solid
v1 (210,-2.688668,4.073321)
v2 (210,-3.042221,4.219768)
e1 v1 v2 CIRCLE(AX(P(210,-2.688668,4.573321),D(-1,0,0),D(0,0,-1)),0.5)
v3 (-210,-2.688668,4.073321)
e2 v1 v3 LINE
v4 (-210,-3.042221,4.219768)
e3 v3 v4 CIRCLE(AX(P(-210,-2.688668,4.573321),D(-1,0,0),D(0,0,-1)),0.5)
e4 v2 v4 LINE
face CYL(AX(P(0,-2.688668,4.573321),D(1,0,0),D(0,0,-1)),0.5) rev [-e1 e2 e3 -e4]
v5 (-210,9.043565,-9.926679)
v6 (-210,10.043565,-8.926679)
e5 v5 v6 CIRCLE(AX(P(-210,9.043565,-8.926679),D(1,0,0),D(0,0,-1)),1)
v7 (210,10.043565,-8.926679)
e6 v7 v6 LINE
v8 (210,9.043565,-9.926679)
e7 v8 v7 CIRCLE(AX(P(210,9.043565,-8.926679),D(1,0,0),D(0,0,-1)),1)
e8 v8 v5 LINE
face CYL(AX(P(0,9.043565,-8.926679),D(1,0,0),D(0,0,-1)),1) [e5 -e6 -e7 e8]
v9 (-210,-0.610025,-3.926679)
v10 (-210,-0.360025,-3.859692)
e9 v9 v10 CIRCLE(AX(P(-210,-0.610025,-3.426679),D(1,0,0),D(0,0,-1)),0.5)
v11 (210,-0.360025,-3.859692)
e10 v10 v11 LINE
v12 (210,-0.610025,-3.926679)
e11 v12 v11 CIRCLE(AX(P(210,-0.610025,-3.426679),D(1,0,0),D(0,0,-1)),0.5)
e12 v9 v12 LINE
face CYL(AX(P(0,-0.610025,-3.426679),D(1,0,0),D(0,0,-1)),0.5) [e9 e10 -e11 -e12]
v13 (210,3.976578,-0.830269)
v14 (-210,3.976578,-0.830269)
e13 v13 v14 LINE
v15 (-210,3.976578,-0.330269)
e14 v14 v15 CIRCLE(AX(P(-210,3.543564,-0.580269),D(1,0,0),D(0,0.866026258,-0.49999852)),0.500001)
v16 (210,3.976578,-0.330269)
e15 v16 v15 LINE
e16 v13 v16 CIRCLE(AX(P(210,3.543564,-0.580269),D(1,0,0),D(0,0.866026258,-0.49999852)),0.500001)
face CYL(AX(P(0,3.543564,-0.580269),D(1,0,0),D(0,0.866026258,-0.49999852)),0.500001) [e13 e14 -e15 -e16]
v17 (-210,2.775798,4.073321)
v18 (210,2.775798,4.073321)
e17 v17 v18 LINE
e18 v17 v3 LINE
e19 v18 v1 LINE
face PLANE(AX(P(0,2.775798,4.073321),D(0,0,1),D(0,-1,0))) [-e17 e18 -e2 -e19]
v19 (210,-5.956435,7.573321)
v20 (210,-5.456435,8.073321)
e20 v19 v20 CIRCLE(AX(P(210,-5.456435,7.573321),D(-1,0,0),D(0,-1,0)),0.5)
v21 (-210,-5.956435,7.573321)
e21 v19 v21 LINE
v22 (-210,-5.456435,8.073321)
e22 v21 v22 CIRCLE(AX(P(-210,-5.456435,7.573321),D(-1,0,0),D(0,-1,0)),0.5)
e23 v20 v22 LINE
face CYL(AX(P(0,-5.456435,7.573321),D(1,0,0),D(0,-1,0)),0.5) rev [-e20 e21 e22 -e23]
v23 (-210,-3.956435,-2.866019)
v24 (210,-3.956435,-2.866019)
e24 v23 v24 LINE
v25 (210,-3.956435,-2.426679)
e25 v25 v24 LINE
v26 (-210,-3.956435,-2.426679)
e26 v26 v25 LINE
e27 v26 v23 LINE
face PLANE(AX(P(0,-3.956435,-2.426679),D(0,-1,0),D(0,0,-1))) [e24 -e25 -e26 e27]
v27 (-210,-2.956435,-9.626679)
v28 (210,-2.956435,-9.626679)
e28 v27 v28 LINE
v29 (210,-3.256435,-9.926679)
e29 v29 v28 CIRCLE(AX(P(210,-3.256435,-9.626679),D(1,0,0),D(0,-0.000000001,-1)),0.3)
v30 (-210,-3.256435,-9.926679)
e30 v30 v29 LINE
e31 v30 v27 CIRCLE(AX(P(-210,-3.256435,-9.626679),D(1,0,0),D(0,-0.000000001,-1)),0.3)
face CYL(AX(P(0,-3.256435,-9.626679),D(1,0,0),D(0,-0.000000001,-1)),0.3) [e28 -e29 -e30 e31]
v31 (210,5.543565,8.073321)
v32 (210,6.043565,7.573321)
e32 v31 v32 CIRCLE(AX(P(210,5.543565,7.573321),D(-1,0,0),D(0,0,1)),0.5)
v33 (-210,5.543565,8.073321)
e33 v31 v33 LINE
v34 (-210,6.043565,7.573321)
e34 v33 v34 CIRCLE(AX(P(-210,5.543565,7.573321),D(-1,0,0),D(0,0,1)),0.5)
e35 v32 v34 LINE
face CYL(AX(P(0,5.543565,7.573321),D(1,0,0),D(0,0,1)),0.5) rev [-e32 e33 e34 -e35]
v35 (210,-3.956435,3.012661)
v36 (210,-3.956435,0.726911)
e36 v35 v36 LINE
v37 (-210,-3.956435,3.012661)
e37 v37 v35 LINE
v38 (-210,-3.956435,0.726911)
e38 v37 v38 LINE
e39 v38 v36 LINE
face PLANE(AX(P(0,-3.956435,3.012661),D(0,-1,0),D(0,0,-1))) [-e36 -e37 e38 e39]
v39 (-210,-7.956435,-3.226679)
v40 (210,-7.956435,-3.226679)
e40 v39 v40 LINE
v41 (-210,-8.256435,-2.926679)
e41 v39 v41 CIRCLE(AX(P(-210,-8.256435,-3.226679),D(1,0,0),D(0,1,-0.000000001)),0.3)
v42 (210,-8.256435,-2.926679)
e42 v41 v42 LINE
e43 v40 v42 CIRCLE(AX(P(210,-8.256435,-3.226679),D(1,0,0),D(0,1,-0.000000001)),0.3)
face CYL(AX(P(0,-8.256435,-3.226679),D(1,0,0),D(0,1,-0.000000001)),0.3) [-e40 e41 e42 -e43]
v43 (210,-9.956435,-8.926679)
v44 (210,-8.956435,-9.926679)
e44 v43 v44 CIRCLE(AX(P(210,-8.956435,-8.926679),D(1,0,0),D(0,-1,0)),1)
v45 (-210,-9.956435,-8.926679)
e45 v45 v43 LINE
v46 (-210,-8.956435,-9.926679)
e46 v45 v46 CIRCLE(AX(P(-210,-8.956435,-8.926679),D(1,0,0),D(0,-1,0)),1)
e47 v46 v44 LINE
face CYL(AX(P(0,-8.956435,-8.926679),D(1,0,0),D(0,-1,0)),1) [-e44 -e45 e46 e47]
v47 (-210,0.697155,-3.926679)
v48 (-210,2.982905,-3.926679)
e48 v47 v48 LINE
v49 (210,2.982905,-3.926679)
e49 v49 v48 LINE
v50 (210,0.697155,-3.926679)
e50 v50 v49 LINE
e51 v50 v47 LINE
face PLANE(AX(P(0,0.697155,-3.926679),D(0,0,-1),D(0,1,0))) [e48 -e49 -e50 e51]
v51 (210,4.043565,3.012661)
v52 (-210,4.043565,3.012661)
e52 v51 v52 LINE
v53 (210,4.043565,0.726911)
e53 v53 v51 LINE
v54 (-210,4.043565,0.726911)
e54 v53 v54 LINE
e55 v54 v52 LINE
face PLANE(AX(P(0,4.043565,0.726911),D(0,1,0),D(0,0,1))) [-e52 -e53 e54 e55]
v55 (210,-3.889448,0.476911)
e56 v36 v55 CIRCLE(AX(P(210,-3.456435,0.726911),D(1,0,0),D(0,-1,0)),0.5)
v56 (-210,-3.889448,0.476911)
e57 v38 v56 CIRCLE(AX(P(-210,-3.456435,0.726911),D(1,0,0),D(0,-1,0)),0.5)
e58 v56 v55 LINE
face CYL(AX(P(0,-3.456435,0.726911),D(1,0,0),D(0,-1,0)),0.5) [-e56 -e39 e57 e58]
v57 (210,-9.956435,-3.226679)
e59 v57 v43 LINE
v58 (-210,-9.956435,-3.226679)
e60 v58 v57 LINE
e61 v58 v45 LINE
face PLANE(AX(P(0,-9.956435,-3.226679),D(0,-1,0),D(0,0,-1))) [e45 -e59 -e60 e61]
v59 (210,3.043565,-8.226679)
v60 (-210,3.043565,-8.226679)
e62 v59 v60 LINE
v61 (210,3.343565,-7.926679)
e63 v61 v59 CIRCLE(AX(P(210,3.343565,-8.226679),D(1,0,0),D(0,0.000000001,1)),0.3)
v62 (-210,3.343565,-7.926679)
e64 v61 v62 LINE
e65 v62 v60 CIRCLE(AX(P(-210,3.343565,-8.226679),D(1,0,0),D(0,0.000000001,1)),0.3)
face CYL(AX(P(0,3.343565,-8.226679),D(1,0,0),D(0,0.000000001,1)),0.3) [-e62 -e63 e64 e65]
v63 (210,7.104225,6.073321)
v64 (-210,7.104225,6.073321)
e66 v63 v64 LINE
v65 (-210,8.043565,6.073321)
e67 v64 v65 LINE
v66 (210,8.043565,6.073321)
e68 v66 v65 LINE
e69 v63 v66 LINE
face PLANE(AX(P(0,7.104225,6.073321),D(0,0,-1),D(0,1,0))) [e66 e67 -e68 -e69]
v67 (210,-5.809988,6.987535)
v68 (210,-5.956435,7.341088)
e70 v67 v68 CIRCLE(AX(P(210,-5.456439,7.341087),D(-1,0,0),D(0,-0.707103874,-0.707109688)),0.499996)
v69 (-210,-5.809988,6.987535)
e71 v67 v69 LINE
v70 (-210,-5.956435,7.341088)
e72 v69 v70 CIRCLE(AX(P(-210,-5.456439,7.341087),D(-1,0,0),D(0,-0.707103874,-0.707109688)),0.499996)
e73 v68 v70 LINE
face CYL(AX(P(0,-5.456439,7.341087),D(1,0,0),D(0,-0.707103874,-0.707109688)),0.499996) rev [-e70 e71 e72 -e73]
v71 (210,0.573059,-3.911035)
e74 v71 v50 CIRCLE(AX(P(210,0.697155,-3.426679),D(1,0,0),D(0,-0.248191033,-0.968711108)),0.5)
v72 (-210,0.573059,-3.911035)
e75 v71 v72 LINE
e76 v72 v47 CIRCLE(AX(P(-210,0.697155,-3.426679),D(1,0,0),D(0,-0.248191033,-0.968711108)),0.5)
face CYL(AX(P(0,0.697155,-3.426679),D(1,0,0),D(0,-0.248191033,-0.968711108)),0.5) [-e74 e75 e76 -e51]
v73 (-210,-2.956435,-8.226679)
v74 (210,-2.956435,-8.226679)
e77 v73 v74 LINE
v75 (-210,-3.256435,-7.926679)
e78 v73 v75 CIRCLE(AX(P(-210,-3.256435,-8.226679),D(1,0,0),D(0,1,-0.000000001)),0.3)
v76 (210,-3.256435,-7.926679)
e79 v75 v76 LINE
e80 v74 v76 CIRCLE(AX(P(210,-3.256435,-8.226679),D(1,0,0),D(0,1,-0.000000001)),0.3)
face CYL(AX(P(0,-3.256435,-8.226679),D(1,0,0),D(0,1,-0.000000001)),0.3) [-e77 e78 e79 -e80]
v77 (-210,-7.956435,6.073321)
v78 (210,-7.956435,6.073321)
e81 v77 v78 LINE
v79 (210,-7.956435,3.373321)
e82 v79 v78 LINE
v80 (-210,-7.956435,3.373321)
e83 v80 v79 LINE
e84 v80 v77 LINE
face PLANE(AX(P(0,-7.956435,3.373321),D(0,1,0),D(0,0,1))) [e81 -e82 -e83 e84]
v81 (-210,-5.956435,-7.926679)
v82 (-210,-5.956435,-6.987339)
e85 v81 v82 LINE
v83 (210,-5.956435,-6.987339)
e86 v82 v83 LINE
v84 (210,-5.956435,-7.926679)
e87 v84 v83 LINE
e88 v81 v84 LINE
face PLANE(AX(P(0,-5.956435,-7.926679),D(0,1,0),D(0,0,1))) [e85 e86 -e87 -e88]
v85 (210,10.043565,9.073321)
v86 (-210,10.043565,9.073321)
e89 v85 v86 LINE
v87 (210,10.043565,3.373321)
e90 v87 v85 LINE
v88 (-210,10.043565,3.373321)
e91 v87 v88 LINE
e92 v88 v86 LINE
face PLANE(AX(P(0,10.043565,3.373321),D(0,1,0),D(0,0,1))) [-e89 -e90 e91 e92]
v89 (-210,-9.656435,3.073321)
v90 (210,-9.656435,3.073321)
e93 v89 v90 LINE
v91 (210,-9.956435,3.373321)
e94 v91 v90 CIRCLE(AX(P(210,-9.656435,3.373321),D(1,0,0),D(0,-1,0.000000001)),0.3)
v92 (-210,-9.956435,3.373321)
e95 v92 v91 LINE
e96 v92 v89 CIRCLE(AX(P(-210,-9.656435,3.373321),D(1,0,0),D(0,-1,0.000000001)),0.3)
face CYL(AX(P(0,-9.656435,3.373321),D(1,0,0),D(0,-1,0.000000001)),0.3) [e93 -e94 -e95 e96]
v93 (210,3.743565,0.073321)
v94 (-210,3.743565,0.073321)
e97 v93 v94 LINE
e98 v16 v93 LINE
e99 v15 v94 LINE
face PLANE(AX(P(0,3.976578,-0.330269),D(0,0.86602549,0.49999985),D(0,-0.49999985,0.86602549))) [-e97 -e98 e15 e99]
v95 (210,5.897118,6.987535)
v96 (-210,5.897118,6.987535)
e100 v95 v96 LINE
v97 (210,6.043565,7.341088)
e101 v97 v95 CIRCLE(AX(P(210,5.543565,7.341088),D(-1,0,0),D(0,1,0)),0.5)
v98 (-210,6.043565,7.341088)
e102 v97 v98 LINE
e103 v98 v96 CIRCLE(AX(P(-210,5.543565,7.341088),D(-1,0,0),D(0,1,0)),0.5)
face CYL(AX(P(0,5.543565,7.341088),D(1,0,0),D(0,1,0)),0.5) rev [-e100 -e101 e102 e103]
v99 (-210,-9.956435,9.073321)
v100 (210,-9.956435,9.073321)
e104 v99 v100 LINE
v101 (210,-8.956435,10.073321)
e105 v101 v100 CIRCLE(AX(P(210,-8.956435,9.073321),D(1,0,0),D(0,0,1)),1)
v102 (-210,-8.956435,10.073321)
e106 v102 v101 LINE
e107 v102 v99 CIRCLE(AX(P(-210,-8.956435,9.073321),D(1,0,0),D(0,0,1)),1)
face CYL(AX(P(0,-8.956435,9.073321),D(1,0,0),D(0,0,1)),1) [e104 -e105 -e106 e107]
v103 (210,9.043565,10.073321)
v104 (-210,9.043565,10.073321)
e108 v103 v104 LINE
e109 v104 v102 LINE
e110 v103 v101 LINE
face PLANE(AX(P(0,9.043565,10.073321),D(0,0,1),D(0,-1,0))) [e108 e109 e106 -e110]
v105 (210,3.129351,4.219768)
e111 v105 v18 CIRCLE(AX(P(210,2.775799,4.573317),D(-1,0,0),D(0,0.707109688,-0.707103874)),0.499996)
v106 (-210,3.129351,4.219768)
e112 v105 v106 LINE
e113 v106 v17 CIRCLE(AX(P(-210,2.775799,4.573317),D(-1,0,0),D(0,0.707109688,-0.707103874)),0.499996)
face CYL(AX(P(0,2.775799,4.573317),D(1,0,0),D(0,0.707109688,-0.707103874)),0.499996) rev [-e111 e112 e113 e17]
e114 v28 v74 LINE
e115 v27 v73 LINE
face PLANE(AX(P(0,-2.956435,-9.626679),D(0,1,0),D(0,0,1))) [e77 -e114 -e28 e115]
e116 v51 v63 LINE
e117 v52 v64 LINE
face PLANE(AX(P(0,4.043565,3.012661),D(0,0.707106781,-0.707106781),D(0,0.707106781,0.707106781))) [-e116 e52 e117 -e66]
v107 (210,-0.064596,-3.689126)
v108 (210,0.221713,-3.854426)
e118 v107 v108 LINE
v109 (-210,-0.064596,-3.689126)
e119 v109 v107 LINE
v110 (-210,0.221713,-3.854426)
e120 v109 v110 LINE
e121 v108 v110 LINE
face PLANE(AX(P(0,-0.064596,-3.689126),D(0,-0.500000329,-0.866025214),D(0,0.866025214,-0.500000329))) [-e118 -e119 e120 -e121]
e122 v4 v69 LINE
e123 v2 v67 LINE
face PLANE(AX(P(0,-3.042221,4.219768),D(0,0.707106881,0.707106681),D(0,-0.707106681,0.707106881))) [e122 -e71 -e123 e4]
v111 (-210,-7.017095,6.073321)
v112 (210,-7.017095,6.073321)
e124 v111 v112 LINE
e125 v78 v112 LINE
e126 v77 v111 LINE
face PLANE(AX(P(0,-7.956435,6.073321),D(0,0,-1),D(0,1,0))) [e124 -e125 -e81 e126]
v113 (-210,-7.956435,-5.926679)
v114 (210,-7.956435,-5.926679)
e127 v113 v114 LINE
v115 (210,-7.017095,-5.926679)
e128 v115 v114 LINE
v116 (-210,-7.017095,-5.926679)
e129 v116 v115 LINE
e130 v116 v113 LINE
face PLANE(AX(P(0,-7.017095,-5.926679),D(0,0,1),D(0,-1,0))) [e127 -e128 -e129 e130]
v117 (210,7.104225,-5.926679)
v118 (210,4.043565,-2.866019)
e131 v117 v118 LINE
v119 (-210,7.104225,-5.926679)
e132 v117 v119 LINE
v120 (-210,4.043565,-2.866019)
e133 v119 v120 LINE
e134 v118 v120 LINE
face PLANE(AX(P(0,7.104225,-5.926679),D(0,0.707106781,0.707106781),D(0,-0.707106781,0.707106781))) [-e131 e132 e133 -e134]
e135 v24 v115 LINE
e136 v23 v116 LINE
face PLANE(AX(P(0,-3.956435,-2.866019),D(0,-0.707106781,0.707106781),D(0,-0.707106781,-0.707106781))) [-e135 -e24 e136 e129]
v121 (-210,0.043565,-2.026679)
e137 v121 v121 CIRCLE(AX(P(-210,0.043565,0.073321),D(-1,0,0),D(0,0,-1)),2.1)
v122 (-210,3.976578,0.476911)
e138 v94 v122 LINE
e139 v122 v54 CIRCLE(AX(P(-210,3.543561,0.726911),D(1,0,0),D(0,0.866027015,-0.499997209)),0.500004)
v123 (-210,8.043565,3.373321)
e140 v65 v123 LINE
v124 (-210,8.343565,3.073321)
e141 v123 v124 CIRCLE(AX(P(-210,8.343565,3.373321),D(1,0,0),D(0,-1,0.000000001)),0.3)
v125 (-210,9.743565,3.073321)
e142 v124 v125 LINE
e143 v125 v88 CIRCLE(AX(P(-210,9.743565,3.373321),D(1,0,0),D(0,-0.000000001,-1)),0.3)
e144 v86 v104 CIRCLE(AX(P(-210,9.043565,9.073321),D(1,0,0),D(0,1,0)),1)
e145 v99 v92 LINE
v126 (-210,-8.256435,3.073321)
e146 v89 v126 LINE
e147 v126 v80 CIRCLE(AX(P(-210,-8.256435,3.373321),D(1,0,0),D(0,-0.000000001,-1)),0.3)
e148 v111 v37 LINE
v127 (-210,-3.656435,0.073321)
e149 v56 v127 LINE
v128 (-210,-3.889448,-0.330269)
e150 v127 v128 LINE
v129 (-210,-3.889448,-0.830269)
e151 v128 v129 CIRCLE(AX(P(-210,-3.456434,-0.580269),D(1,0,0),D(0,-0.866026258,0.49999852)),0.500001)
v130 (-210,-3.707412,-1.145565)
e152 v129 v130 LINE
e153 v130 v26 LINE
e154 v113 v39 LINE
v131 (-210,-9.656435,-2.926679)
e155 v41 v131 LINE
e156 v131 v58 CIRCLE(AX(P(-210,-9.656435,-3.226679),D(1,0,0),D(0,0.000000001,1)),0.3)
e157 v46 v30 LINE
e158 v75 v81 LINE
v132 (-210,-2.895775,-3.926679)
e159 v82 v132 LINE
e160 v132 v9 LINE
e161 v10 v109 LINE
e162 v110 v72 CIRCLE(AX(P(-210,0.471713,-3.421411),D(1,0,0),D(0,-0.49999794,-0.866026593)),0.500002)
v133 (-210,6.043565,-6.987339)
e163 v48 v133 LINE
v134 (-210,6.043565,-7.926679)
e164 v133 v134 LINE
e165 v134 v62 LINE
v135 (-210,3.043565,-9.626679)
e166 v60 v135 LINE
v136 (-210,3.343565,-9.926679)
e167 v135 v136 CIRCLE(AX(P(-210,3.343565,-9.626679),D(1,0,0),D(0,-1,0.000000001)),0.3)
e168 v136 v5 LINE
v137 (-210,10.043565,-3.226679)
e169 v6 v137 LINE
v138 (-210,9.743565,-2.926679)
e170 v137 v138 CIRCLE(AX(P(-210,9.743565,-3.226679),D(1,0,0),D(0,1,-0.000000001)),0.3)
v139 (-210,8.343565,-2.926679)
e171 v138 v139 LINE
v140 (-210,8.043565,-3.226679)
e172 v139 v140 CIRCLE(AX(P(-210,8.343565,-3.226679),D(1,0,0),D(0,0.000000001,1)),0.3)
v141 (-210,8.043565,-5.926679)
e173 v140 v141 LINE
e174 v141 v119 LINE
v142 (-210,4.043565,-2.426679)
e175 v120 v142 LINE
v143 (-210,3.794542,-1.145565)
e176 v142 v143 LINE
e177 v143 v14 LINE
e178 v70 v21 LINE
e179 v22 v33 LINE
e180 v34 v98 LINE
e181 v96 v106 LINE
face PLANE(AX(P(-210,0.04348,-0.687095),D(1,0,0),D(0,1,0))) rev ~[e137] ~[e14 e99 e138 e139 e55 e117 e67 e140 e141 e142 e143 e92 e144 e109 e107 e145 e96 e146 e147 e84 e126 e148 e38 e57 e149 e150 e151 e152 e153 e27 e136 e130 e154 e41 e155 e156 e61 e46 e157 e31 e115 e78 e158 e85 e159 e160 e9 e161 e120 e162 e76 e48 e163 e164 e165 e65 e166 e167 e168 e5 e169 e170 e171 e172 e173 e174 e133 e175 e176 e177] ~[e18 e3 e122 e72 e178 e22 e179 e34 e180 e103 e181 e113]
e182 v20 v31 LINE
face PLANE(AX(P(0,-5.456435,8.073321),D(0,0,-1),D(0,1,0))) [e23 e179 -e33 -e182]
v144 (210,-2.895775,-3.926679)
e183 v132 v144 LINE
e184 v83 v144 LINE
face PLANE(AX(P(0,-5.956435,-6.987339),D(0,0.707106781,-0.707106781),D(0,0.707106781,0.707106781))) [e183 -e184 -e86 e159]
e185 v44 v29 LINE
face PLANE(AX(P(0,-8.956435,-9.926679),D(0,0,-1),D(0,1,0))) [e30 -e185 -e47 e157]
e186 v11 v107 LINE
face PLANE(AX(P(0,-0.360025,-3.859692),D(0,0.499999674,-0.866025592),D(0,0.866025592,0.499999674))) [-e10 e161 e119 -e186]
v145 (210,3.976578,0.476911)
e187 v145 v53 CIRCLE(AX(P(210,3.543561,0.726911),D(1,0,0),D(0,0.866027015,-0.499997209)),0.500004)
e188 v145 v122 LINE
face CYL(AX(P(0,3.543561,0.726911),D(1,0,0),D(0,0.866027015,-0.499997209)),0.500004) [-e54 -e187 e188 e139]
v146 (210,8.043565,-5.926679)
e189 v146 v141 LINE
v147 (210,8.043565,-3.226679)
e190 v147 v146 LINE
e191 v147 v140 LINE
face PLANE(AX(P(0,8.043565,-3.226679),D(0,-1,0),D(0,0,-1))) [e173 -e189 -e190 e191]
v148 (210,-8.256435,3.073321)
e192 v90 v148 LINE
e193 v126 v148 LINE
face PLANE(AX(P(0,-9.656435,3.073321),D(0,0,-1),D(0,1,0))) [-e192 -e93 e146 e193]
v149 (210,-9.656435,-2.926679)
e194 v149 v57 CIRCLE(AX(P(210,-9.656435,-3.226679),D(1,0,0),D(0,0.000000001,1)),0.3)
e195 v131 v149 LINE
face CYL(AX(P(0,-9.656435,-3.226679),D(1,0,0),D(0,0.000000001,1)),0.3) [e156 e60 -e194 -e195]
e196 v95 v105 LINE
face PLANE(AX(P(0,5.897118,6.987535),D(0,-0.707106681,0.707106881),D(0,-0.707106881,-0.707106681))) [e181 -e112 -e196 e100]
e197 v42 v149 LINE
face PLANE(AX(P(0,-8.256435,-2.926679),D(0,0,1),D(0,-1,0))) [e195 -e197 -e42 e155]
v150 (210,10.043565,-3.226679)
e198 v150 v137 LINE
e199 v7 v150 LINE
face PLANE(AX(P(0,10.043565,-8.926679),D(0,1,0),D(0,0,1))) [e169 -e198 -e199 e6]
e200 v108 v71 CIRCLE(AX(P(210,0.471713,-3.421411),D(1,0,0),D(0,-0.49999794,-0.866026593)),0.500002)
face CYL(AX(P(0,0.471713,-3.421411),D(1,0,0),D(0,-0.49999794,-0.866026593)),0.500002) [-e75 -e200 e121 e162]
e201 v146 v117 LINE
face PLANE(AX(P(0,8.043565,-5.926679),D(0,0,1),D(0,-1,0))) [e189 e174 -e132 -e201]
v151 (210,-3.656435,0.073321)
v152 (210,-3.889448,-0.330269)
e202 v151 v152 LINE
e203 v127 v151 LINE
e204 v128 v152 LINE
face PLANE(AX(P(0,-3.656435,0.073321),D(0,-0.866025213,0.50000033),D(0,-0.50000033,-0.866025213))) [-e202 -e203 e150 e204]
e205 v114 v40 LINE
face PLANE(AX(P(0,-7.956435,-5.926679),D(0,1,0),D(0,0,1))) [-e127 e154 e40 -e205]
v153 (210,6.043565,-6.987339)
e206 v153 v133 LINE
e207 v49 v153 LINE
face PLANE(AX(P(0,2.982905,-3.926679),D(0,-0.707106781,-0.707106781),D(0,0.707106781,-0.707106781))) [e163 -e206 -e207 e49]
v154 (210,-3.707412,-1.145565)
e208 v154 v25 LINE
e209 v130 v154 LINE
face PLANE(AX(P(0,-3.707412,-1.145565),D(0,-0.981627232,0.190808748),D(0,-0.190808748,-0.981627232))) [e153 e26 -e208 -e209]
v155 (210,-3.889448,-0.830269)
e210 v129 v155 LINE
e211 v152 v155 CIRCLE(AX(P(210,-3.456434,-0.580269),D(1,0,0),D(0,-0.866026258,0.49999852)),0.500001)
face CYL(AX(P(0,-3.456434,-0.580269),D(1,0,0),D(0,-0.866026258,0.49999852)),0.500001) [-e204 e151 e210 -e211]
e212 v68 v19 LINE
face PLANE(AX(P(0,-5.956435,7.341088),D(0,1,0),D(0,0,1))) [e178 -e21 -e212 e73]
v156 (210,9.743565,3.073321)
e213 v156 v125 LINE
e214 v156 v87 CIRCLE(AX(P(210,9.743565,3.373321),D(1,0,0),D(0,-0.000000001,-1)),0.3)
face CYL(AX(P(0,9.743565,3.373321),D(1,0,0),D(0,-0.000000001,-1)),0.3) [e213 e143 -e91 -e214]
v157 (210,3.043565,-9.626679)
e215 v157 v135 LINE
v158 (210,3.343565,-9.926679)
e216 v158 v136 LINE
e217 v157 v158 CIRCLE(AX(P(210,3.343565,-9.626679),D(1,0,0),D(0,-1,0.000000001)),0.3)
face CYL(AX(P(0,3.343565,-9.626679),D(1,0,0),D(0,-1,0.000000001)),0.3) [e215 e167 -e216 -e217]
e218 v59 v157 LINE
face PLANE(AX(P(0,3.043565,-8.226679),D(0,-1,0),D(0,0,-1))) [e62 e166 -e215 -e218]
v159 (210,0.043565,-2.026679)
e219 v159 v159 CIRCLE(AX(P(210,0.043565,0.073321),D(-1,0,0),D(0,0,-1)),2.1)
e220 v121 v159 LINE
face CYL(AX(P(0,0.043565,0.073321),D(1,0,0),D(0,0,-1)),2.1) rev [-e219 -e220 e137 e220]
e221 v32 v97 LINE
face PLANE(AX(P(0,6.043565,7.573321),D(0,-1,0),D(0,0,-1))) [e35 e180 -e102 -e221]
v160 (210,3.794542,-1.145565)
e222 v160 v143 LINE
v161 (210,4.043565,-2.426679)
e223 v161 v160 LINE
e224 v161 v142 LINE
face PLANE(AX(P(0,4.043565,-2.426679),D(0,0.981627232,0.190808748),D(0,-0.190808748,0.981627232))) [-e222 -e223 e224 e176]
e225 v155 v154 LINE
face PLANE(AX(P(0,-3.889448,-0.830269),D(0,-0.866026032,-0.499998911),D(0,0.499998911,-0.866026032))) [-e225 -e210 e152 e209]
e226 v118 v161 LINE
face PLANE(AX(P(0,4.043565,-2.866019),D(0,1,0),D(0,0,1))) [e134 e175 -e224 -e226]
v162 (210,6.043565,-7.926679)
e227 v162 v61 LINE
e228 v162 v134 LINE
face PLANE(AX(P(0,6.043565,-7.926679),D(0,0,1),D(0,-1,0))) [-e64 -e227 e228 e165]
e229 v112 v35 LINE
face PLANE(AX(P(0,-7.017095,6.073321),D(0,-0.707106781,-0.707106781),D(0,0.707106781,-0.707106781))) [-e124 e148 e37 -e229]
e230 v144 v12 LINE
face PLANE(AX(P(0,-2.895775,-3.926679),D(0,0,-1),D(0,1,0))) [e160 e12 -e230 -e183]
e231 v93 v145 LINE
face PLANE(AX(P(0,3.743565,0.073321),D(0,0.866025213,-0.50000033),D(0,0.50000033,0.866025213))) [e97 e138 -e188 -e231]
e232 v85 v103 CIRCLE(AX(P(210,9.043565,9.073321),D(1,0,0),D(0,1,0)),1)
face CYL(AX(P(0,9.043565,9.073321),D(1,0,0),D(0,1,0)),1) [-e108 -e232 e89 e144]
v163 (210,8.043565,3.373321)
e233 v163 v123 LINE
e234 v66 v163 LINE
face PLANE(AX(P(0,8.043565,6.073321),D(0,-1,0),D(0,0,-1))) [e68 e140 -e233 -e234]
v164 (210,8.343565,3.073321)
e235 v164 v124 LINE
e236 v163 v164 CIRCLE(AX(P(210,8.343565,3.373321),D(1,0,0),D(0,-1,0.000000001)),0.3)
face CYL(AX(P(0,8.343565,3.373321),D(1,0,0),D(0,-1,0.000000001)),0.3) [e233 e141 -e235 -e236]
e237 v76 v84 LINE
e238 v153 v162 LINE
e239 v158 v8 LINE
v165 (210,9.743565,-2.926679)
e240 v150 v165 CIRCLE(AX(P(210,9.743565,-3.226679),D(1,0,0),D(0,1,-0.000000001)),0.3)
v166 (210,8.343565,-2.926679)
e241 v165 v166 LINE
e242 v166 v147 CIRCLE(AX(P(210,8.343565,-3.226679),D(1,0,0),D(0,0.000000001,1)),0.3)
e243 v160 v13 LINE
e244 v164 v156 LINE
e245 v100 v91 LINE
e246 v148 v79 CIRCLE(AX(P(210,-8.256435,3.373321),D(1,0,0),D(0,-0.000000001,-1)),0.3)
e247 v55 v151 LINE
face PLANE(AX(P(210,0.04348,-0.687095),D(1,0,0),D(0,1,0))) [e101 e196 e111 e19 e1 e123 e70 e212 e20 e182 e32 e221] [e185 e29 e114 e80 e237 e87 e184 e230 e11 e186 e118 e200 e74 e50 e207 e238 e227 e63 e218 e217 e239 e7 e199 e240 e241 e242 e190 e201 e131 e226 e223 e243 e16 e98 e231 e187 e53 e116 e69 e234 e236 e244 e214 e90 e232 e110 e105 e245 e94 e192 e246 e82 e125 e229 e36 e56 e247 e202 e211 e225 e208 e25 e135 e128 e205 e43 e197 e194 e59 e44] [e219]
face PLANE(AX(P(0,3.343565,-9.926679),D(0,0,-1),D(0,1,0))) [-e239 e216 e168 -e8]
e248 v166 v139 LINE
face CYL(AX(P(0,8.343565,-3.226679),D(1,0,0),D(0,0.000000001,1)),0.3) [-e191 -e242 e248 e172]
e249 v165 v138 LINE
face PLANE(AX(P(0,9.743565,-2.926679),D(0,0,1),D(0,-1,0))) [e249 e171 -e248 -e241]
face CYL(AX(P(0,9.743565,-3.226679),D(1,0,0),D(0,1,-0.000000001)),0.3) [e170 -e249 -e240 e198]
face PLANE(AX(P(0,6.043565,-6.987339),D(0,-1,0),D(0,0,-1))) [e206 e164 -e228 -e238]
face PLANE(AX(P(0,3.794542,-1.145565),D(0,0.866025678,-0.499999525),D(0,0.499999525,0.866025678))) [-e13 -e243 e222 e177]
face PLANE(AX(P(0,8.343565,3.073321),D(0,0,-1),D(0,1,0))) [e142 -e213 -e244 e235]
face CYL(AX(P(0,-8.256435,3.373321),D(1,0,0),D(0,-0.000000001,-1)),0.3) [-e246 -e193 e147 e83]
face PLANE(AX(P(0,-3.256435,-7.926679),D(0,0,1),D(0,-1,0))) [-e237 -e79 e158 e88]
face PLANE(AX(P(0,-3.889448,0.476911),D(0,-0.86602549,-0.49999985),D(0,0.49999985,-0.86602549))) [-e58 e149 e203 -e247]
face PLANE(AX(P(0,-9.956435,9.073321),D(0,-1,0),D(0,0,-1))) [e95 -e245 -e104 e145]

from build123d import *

# Parameters (mm, degrees)
F1_DEPTH = 210


# Not quite as in the source:
# - ends of sketch curves that miss each other by under 0.0002 mm in the source are joined


with BuildPart() as f1:
    # F0 (on Right) → F1 (new body, symmetric)
    with BuildSketch(Plane.YZ):
        with BuildLine():
            Line((9.043565, 10.073321), (0.043565, 10.073321))
            Line((0.043565, 10.073321), (-8.956435, 10.073321))
            ThreePointArc((-8.956435, 10.073321), (-9.6635417812, 9.7804277812), (-9.956435, 9.073321))
            Line((-9.956435, 9.073321), (-9.956435, 3.373321))
            ThreePointArc((-9.956435, 3.373321), (-9.8685670344, 3.1611889656), (-9.656435, 3.073321))
            Line((-9.656435, 3.073321), (-8.256435, 3.073321))
            ThreePointArc((-8.256435, 3.073321), (-8.0443029656, 3.1611889656), (-7.956435, 3.373321))
            Line((-7.956435, 3.373321), (-7.956435, 6.073321))
            Line((-7.956435, 6.073321), (-7.017095, 6.073321))
            Line((-7.017095, 6.073321), (-3.956435, 3.012661))
            Line((-3.956435, 3.012661), (-3.956435, 0.726911))
            ThreePointArc((-3.956435, 0.726911), (-3.9393979324, 0.5975015494), (-3.8894477764, 0.4769111291))
            Line((-3.8894477764, 0.4769111291), (-3.656435, 0.073321))
            Line((-3.656435, 0.073321), (-3.889448, -0.330269))
            ThreePointArc((-3.889448, -0.330269), (-3.956435, -0.580269), (-3.8894477764, -0.8302688709))
            Line((-3.8894477764, -0.8302688709), (-3.707412, -1.145565))
            Line((-3.707412, -1.145565), (-3.956435, -2.426679))
            Line((-3.956435, -2.426679), (-3.956435, -2.866019))
            Line((-3.956435, -2.866019), (-7.017095, -5.926679))
            Line((-7.017095, -5.926679), (-7.956435, -5.926679))
            Line((-7.956435, -5.926679), (-7.956435, -3.226679))
            ThreePointArc((-7.956435, -3.226679), (-8.0443029656, -3.0145469656), (-8.256435, -2.926679))
            Line((-8.256435, -2.926679), (-9.656435, -2.926679))
            ThreePointArc((-9.656435, -2.926679), (-9.8685670344, -3.0145469656), (-9.956435, -3.226679))
            Line((-9.956435, -3.226679), (-9.956435, -8.926679))
            ThreePointArc((-9.956435, -8.926679), (-9.6635417812, -9.6337857812), (-8.956435, -9.926679))
            Line((-8.956435, -9.926679), (-3.256435, -9.926679))
            ThreePointArc((-3.256435, -9.926679), (-3.0443029656, -9.8388110344), (-2.956435, -9.626679))
            Line((-2.956435, -9.626679), (-2.956435, -8.226679))
            ThreePointArc((-2.956435, -8.226679), (-3.0443029656, -8.0145469656), (-3.256435, -7.926679))
            Line((-3.256435, -7.926679), (-5.956435, -7.926679))
            Line((-5.956435, -7.926679), (-5.956435, -6.987339))
            Line((-5.956435, -6.987339), (-2.895775, -3.926679))
            Line((-2.895775, -3.926679), (-0.610025, -3.926679))
            ThreePointArc((-0.610025, -3.926679), (-0.4806155494, -3.9096419324), (-0.3600251291, -3.8596917764))
            Line((-0.3600251291, -3.8596917764), (-0.0645959325, -3.6891257984))
            Line((-0.0645959325, -3.6891257984), (0.2217128734, -3.8544264098))
            ThreePointArc((0.2217128734, -3.8544264098), (0.3921793907, -3.9150473077), (0.5730594828, -3.9110345539))
            ThreePointArc((0.5730594828, -3.9110345539), (0.6346161199, -3.9227524708), (0.697155, -3.926679))
            Line((0.697155, -3.926679), (2.982905, -3.926679))
            Line((2.982905, -3.926679), (6.043565, -6.987339))
            Line((6.043565, -6.987339), (6.043565, -7.926679))
            Line((6.043565, -7.926679), (3.343565, -7.926679))
            ThreePointArc((3.343565, -7.926679), (3.1314329656, -8.0145469656), (3.043565, -8.226679))
            Line((3.043565, -8.226679), (3.043565, -9.626679))
            ThreePointArc((3.043565, -9.626679), (3.1314329656, -9.8388110344), (3.343565, -9.926679))
            Line((3.343565, -9.926679), (9.043565, -9.926679))
            ThreePointArc((9.043565, -9.926679), (9.7506717812, -9.6337857812), (10.043565, -8.926679))
            Line((10.043565, -8.926679), (10.043565, -3.226679))
            ThreePointArc((10.043565, -3.226679), (9.9556970344, -3.0145469656), (9.743565, -2.926679))
            Line((9.743565, -2.926679), (8.343565, -2.926679))
            ThreePointArc((8.343565, -2.926679), (8.1314329656, -3.0145469656), (8.043565, -3.226679))
            Line((8.043565, -3.226679), (8.043565, -5.926679))
            Line((8.043565, -5.926679), (7.104225, -5.926679))
            Line((7.104225, -5.926679), (4.043565, -2.866019))
            Line((4.043565, -2.866019), (4.043565, -2.426679))
            Line((4.043565, -2.426679), (3.794542, -1.145565))
            Line((3.794542, -1.145565), (3.976578, -0.830269))
            ThreePointArc((3.976578, -0.830269), (4.043565, -0.580269), (3.9765777764, -0.3302691291))
            Line((3.9765777764, -0.3302691291), (3.743565, 0.073321))
            Line((3.743565, 0.073321), (3.976578, 0.476911))
            ThreePointArc((3.976578, 0.476911), (4.0265279324, 0.5975015494), (4.043565, 0.726911))
            Line((4.043565, 0.726911), (4.043565, 3.012661))
            Line((4.043565, 3.012661), (7.104225, 6.073321))
            Line((7.104225, 6.073321), (8.043565, 6.073321))
            Line((8.043565, 6.073321), (8.043565, 3.373321))
            ThreePointArc((8.043565, 3.373321), (8.1314329656, 3.1611889656), (8.343565, 3.073321))
            Line((8.343565, 3.073321), (9.743565, 3.073321))
            ThreePointArc((9.743565, 3.073321), (9.9556970344, 3.1611889656), (10.043565, 3.373321))
            Line((10.043565, 3.373321), (10.043565, 9.073321))
            ThreePointArc((10.043565, 9.073321), (9.7506717812, 9.7804277812), (9.043565, 10.073321))
        make_face()
        with BuildLine():
            ThreePointArc((0.043565, 2.173321), (2.143565, 0.073321), (0.043565, -2.026679))
            ThreePointArc((0.043565, -2.026679), (-2.056435, 0.073321), (0.043565, 2.173321))
        make_face(mode=Mode.SUBTRACT)
        with BuildLine():
            Line((2.775798, 4.073321), (0.043565, 4.073321))
            Line((0.043565, 4.073321), (-2.688668, 4.073321))
            ThreePointArc((-2.688668, 4.073321), (-2.8800097162, 4.1113812337), (-3.0422213906, 4.2197676094))
            Line((-3.0422213906, 4.2197676094), (-5.809988, 6.987535))
            ThreePointArc((-5.809988, 6.987535), (-5.9183747663, 7.1497462838), (-5.956435, 7.341088))
            Line((-5.956435, 7.341088), (-5.956435, 7.573321))
            ThreePointArc((-5.956435, 7.573321), (-5.8099883906, 7.9268743906), (-5.456435, 8.073321))
            Line((-5.456435, 8.073321), (0.043565, 8.073321))
            Line((0.043565, 8.073321), (5.543565, 8.073321))
            ThreePointArc((5.543565, 8.073321), (5.8971183906, 7.9268743906), (6.043565, 7.573321))
            Line((6.043565, 7.573321), (6.043565, 7.341088))
            ThreePointArc((6.043565, 7.341088), (6.0055047663, 7.1497462838), (5.8971183906, 6.9875346094))
            Line((5.8971183906, 6.9875346094), (3.129351, 4.219768))
            ThreePointArc((3.129351, 4.219768), (2.9671397162, 4.1113812337), (2.775798, 4.073321))
        make_face(mode=Mode.SUBTRACT)
    extrude(amount=F1_DEPTH, both=True)


solid = f1.part
